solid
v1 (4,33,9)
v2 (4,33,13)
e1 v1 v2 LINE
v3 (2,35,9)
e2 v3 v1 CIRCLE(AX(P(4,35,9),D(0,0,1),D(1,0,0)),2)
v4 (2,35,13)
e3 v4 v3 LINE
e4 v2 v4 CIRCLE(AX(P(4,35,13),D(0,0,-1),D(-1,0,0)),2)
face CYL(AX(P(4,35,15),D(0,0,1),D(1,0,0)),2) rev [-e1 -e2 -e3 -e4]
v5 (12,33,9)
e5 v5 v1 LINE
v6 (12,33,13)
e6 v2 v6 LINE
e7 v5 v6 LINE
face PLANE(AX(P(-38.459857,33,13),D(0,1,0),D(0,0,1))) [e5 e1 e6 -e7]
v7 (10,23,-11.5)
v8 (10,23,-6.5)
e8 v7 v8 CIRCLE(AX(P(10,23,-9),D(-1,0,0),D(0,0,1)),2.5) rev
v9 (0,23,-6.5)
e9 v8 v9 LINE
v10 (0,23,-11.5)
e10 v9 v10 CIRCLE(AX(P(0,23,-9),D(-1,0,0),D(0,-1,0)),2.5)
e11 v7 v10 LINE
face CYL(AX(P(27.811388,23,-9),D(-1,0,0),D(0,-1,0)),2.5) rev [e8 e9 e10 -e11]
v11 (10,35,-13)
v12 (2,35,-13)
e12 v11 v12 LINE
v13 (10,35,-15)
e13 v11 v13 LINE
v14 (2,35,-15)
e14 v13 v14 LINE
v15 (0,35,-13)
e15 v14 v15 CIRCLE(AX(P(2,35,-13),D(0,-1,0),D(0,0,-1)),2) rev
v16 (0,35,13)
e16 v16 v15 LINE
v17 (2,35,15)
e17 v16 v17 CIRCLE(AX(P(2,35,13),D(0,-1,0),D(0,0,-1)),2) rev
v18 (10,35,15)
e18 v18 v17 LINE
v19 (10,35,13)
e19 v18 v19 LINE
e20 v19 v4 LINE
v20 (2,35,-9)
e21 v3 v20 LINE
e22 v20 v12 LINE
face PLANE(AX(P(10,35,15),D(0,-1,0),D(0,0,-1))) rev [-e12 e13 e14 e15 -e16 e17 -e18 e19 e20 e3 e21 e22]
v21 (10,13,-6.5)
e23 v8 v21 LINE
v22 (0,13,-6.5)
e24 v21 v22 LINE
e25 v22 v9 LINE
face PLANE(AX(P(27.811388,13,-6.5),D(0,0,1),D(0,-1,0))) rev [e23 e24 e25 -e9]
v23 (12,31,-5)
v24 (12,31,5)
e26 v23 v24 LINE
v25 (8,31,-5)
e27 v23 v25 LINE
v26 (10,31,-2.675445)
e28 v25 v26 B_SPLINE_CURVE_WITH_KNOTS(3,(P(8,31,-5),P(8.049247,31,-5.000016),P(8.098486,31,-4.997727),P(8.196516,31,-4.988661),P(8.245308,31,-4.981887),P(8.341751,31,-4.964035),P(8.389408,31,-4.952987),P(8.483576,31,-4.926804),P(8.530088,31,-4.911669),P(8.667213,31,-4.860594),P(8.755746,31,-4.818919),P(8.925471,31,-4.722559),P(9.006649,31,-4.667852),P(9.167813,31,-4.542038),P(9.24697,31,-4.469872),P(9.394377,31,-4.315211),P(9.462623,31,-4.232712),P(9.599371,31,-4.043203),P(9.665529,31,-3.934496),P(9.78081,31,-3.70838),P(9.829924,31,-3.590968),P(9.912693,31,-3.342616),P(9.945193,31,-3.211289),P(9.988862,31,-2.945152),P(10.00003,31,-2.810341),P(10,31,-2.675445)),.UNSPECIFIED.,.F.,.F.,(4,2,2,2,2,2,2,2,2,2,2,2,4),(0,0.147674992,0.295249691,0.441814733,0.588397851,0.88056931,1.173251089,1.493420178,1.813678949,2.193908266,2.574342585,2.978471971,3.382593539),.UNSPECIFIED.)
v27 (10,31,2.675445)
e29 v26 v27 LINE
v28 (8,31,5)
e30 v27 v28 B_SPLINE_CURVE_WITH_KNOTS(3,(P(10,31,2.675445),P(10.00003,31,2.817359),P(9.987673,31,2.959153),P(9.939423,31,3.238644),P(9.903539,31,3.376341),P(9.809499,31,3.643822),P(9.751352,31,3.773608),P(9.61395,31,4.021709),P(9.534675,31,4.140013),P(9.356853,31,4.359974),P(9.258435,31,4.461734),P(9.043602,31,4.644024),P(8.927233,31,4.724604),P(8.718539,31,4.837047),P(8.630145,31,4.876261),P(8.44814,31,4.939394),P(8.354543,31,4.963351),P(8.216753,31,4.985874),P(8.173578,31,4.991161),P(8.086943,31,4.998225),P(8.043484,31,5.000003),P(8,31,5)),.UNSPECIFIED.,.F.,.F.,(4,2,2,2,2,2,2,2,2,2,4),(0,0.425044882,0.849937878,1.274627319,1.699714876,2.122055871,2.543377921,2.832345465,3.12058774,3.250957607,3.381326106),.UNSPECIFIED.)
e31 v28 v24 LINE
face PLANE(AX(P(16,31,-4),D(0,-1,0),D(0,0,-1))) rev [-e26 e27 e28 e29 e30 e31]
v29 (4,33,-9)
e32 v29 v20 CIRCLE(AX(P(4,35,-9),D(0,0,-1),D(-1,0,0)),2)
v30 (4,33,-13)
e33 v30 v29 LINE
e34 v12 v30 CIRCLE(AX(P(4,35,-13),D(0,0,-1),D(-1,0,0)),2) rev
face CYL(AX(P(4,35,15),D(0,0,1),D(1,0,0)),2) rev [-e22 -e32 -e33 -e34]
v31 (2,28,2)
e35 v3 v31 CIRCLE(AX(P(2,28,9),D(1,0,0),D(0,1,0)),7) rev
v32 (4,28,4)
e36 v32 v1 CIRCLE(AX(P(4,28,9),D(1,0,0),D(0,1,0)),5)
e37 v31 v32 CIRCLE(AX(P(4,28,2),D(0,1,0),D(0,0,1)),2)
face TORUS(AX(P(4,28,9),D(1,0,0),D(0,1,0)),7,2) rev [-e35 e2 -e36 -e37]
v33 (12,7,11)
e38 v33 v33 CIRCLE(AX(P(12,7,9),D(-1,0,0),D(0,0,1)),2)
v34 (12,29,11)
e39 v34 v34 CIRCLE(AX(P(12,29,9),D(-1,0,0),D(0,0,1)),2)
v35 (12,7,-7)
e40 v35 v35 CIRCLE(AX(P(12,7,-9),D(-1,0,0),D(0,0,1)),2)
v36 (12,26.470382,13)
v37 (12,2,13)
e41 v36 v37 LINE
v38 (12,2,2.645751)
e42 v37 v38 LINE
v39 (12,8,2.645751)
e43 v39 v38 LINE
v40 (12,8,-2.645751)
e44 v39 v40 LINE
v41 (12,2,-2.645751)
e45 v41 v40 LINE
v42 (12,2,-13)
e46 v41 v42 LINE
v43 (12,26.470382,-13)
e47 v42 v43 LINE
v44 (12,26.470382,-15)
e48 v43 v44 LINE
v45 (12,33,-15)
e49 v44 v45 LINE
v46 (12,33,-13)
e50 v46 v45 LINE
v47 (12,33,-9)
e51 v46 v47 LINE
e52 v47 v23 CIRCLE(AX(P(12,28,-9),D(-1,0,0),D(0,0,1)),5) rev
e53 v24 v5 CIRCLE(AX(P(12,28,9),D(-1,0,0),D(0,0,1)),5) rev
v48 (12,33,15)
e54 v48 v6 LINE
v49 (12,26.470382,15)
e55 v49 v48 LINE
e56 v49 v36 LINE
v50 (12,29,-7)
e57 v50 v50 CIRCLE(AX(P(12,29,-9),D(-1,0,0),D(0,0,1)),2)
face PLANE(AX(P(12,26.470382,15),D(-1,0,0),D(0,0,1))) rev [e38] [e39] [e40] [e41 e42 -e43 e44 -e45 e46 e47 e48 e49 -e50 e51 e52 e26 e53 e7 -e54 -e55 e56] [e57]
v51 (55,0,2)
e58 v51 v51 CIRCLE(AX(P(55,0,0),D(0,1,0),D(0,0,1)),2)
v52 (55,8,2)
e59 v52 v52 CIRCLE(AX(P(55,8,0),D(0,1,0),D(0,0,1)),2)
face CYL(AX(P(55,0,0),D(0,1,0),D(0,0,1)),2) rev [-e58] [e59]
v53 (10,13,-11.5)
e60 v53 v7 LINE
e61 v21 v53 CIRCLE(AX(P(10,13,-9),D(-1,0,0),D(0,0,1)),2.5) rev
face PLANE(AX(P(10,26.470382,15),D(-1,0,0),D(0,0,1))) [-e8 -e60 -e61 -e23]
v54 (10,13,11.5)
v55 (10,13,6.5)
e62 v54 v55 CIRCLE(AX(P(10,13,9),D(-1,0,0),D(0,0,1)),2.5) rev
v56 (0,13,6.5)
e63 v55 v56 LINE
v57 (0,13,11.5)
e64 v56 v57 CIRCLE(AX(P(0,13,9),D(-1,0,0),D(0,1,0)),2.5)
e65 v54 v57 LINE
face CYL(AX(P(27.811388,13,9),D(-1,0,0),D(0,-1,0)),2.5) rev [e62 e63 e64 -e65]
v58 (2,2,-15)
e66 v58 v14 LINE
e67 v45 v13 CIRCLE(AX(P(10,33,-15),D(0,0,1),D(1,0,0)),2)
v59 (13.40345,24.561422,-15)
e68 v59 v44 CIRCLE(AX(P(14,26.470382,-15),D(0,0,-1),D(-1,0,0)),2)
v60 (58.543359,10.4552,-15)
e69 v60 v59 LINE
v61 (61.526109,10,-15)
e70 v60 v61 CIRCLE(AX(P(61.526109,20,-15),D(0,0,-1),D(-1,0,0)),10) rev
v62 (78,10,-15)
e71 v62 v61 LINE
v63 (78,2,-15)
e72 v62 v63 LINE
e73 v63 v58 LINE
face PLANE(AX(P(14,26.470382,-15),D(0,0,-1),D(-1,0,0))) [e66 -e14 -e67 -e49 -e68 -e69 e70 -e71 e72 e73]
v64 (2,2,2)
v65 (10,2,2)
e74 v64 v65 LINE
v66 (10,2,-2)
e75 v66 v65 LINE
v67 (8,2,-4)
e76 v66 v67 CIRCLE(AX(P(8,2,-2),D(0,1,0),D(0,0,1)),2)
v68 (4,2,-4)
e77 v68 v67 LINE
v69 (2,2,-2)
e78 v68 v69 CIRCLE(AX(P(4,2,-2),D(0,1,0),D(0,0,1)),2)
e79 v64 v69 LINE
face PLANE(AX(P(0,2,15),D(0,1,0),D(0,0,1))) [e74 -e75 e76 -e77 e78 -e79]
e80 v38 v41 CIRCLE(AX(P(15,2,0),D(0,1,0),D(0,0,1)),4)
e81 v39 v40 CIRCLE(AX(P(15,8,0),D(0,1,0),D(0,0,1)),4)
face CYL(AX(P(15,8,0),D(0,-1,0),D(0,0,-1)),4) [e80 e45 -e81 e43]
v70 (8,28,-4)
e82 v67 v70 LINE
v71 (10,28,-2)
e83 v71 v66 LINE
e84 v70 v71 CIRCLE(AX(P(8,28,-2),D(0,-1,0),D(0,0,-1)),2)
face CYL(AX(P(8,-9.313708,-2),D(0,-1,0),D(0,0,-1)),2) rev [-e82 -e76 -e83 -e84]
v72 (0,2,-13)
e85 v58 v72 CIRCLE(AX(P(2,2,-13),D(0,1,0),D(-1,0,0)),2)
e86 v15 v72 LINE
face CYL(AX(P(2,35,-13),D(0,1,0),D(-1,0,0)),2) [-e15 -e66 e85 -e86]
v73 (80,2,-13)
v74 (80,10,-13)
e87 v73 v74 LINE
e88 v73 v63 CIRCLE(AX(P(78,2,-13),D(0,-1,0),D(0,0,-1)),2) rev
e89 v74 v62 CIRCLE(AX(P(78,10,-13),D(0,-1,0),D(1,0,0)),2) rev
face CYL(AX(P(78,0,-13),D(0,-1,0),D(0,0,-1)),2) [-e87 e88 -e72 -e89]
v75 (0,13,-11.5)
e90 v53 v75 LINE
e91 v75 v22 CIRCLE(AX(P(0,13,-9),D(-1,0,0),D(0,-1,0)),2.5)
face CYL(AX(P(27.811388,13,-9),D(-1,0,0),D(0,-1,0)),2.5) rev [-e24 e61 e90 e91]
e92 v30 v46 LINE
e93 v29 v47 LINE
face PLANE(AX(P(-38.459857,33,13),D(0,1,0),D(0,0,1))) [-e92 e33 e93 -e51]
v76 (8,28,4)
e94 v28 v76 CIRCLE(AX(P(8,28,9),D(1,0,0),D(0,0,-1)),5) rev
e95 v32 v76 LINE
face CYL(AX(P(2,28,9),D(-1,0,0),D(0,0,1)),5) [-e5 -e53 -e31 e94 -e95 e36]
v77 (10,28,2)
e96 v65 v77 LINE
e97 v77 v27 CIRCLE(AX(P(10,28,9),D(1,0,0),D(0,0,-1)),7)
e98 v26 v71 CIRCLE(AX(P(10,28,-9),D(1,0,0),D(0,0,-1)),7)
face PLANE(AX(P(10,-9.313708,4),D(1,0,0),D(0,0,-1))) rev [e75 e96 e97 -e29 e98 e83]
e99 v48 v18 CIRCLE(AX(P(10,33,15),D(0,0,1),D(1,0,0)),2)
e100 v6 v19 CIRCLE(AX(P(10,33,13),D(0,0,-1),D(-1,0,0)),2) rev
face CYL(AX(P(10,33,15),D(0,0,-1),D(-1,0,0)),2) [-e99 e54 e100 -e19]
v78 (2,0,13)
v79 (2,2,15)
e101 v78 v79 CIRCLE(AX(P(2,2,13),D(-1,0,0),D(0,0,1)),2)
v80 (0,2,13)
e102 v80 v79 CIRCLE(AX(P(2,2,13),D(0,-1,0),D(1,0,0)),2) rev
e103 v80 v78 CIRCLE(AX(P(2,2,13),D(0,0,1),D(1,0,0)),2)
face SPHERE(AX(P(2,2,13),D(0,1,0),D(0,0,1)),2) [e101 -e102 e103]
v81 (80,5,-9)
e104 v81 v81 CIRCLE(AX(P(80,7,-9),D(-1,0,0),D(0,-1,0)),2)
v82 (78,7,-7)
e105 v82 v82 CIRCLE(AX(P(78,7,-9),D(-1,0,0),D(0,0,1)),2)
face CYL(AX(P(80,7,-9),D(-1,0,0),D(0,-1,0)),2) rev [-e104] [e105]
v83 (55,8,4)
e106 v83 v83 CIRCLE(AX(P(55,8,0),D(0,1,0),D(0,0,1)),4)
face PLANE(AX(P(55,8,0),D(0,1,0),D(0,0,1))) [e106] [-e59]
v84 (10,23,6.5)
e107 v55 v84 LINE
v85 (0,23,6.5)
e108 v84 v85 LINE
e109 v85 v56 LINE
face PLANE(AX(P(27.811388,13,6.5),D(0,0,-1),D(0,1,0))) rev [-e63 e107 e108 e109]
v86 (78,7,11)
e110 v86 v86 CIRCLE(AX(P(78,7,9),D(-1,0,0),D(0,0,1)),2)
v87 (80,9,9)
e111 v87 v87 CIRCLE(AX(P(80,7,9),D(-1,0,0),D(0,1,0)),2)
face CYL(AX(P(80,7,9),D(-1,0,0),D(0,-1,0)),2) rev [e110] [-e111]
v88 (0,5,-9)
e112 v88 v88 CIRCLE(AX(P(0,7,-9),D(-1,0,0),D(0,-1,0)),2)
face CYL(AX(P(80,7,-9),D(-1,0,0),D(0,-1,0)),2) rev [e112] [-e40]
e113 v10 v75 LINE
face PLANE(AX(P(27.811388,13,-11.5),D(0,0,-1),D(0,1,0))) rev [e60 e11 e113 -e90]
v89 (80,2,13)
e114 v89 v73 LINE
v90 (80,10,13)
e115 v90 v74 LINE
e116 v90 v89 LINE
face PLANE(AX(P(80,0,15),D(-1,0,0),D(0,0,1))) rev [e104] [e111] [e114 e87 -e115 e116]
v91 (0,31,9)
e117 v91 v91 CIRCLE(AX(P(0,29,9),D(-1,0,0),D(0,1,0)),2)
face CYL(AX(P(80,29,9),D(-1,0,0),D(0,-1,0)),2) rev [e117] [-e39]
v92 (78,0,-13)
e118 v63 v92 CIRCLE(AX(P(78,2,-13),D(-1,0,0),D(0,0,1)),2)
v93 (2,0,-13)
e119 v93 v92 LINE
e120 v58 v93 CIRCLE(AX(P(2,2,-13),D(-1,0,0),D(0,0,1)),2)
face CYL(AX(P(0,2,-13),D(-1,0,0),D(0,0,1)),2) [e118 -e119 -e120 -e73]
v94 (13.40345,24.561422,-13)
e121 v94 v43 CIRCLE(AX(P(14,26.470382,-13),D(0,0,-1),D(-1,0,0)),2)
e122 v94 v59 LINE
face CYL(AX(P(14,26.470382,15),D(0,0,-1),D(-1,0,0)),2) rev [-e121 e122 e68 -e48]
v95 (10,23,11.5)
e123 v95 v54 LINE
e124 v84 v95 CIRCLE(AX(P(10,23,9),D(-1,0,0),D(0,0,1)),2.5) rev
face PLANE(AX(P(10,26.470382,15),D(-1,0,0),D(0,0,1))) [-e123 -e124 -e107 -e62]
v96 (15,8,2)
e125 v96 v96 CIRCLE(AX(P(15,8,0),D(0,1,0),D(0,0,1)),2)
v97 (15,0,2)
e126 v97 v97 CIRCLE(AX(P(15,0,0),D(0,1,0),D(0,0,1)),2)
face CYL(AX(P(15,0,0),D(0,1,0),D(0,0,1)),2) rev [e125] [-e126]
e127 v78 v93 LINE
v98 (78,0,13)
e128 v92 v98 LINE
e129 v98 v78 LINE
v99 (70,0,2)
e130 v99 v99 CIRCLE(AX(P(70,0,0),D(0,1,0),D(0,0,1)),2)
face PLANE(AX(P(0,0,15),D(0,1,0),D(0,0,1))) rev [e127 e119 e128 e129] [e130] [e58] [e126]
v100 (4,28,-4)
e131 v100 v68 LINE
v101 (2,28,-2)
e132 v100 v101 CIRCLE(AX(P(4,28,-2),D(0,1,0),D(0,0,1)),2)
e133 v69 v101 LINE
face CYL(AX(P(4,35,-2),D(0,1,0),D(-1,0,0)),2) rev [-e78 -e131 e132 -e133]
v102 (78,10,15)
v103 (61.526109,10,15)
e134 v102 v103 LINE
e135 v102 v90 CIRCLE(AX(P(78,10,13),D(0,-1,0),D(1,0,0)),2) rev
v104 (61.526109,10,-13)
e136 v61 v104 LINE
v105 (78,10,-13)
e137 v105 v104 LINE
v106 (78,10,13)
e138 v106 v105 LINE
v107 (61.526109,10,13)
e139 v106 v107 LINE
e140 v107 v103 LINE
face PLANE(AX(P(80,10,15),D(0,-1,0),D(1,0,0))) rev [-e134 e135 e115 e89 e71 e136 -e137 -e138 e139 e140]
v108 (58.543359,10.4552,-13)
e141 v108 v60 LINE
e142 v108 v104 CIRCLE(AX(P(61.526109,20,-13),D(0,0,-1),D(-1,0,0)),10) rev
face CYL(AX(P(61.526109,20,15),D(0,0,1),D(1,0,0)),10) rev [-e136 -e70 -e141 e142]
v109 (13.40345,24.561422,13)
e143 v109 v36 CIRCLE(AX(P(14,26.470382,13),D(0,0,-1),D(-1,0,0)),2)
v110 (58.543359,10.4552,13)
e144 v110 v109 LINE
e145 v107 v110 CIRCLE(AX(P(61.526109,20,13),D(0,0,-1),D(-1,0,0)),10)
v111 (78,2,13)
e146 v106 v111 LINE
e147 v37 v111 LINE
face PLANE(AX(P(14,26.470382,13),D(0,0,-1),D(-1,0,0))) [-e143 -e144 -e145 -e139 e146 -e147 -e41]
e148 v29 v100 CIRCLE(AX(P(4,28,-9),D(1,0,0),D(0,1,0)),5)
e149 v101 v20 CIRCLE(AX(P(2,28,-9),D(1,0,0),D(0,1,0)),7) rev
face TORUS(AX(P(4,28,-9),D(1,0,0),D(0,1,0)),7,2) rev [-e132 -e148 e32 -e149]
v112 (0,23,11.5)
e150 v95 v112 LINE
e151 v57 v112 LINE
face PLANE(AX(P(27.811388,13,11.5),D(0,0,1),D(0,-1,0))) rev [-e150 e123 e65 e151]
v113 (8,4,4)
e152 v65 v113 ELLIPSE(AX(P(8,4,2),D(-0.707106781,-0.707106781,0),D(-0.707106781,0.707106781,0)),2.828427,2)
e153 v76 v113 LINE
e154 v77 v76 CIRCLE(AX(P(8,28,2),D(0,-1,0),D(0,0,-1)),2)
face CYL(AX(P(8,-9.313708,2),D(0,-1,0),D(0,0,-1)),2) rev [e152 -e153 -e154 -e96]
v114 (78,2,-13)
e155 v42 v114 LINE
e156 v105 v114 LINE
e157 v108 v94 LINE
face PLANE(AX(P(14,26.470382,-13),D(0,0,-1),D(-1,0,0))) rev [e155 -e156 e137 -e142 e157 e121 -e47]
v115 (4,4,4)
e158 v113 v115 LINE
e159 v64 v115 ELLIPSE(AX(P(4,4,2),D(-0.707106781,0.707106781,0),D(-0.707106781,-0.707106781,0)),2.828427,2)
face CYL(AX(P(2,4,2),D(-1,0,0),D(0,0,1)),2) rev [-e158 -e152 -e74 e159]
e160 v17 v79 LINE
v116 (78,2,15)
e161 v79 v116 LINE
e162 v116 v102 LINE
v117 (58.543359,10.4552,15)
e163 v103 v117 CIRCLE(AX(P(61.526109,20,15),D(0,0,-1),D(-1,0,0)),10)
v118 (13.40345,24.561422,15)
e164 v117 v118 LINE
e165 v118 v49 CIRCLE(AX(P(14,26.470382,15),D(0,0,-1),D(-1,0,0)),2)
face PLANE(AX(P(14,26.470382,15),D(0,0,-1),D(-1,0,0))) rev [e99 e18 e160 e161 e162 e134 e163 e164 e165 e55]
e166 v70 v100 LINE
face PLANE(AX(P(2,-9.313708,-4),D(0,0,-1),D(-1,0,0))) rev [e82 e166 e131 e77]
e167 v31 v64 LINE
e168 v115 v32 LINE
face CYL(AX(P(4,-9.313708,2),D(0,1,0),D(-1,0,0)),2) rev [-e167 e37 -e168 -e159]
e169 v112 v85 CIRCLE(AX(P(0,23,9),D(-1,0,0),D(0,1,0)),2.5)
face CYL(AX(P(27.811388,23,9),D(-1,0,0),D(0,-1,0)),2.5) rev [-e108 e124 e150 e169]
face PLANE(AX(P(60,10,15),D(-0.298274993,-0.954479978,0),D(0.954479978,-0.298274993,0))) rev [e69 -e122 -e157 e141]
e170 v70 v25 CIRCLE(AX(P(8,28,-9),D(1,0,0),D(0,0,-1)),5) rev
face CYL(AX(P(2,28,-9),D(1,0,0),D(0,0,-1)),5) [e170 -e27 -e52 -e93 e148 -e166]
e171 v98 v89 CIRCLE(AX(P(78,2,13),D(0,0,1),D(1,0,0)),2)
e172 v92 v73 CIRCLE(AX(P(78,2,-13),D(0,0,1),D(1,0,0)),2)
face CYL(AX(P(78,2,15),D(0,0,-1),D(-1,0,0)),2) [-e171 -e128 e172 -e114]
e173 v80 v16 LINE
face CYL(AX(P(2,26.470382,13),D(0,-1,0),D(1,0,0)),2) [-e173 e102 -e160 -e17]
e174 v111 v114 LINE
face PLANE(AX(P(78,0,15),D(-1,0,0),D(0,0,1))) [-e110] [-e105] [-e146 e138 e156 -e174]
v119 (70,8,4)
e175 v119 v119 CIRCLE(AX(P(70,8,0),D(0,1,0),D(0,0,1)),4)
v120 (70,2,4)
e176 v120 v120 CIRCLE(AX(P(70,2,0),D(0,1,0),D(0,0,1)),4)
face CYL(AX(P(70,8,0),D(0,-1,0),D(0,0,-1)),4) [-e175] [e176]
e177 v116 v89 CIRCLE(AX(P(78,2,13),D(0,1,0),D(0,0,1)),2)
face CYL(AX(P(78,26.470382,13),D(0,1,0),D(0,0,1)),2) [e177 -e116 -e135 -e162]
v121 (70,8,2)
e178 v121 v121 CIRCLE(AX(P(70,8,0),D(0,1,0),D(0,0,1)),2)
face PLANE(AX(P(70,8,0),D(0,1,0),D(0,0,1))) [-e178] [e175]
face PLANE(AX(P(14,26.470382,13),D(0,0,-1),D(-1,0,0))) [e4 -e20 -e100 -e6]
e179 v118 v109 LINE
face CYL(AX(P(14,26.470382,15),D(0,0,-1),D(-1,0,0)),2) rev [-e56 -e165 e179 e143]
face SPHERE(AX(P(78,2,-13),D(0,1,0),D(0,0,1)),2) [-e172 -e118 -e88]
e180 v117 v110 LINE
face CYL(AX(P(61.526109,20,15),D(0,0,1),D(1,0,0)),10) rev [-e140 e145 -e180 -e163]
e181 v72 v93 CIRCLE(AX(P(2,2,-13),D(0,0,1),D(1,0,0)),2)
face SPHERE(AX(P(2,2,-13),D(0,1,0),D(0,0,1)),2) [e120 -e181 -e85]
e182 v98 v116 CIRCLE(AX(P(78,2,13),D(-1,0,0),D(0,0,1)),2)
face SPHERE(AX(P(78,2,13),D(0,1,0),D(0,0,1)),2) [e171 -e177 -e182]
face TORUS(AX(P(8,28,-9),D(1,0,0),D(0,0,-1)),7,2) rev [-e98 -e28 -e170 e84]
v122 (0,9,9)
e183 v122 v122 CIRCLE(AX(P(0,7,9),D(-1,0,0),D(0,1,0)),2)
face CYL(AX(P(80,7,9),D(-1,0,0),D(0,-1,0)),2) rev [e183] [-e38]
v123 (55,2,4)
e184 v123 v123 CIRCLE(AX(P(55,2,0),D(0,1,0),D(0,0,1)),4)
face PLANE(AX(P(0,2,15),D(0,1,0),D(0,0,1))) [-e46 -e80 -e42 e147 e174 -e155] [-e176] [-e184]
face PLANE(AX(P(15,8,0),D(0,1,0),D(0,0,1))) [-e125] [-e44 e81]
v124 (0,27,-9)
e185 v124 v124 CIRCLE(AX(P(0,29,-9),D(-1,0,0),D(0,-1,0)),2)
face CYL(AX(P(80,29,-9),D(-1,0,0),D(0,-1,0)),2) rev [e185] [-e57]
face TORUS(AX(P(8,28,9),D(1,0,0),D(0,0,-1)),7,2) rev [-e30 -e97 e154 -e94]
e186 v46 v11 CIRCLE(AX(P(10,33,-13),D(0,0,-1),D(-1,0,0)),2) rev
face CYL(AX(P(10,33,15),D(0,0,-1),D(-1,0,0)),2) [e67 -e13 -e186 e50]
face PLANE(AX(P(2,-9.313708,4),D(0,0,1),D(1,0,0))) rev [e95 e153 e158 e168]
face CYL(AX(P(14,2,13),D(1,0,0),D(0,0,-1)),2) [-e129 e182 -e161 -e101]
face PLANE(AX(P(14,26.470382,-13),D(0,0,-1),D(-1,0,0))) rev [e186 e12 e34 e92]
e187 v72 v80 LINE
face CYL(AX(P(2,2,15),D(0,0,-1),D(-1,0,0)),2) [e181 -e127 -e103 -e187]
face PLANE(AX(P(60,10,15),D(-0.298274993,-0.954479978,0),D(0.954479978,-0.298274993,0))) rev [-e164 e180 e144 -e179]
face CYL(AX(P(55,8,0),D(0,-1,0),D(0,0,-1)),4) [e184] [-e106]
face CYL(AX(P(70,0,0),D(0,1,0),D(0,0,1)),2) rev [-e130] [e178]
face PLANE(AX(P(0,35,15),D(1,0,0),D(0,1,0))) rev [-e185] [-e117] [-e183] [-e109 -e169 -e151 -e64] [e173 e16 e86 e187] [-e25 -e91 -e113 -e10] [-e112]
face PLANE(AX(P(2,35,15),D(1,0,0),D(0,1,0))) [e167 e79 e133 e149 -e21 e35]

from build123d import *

# Parameters (mm, degrees)
BOSS_EXTRUDE1_DEPTH = 15
FILLET2_R           = 10
FILLET3_R           = 2
FILLET4_R           = 2
SHELL1_START        = 2
SHELL1_OUTLINE_W    = 33
SHELL1_OUTLINE_H    = 26
SHELL1_DEPTH        = 76
SKETCH2_R           = 2
CUT_EXTRUDE1_DEPTH  = 88.82938005
BOSS_EXTRUDE2_START = 6
SKETCH3_R           = 4
SKETCH3_R_2         = 2
BOSS_EXTRUDE2_DEPTH = 6
SKETCH4_W           = 26
SKETCH4_H           = 31
BOSS_EXTRUDE3_DEPTH = 10
SKETCH5_W           = 8
SKETCH5_H           = 8
CUT_EXTRUDE2_DEPTH  = 31
SKETCH6_W           = 8
SKETCH6_H           = 2
CUT_EXTRUDE3_DEPTH  = 6
FILLET5_R           = 5
FILLET6_R           = 2
SKETCH7_R           = 2
CUT_EXTRUDE4_DEPTH  = 89.600225733
CUT_EXTRUDE6_DEPTH  = 10


# Read off the part's stored shape, not the designer's step: Shell1
# Some blends are built 0.0001 mm under size
with BuildPart() as part:
    # Sketch1 → Boss-Extrude1 (new, symmetric)
    with BuildSketch(Plane.XY):
        with BuildLine():
            Line((0, 35), (0, 0))
            Line((0, 0), (80, 0))
            Line((80, 0), (80, 10))
            Line((80, 10), (60, 10))
            Line((60, 10), (13.403450014, 24.561421871))
            ThreePointArc((13.403450014, 24.561421871), (12.388618609, 25.28570887), (12, 26.470381827))
            Line((12, 26.470381827), (12, 33))
            ThreePointArc((12, 33), (11.414213562, 34.414213562), (10, 35))
            Line((10, 35), (0, 35))
        make_face()
    extrude(amount=BOSS_EXTRUDE1_DEPTH, both=True)

    # Fillet2
    fillet2_edges = [part.edges().sort_by_distance(p)[0] for p in [
        (60, 10, 0),
    ]]
    fillet(fillet2_edges, radius=FILLET2_R)

    # Fillet3
    fillet3_edges = [part.edges().sort_by_distance(p)[0] for p in [
        (80, 5, -15),
        (0, 17.5, -15),
        (80, 5, 15),
        (0, 17.5, 15),
    ]]
    fillet(fillet3_edges, radius=FILLET3_R)

    # Fillet4
    fillet4_edges = [part.edges().sort_by_distance(p)[0] for p in [
        (0, 0, 0),
        (40, 0, -15),
        (80, 0, 0),
        (40, 0, 15),
        (79.414213562, 0, 14.414213562),
        (79.414213562, 0, -14.414213562),
        (0.585786438, 0, 14.414213562),
        (0.585786438, 0, -14.414213562),
    ]]
    fillet(fillet4_edges, radius=FILLET4_R)

    # Shell1 outline → Shell1 (cut)
    with BuildSketch(Plane.YZ.offset(SHELL1_START)):
        with Locations((18.5, 0)):
            Rectangle(SHELL1_OUTLINE_W, SHELL1_OUTLINE_H)
    extrude(amount=SHELL1_DEPTH, mode=Mode.SUBTRACT)

    # Sketch2 → Cut-Extrude1 (cut, through all)
    with BuildSketch(Plane(origin=(0, 2, 0), x_dir=(1, 0, 0), z_dir=(0, 1, 0))):
        with Locations(Location((70, 0, 0), (0, 0, 270))):
            Circle(SKETCH2_R)
        with Locations(Location((55, 0, 0), (0, 0, 270))):
            Circle(SKETCH2_R)
        with Locations(Location((15, 0, 0), (0, 0, 270))):
            Circle(SKETCH2_R)
    extrude(amount=-CUT_EXTRUDE1_DEPTH, mode=Mode.SUBTRACT)

    # Sketch3 → Boss-Extrude2 (add)
    # profile 1 of 3: a face of its own
    with BuildSketch(Plane(origin=(0, 2, 0), x_dir=(1, 0, 0), z_dir=(0, 1, 0)).offset(BOSS_EXTRUDE2_START)):
        with Locations(Location((70, 0, 0), (0, 0, 270))):
            Circle(SKETCH3_R)
        with Locations(Location((70, 0, 0), (0, 0, 270))):
            Circle(SKETCH3_R_2, mode=Mode.SUBTRACT)
    # profile 2 of 3: a face of its own
    with BuildSketch(Plane(origin=(0, 2, 0), x_dir=(1, 0, 0), z_dir=(0, 1, 0)).offset(BOSS_EXTRUDE2_START)):
        with Locations(Location((55, 0, 0), (0, 0, 270))):
            Circle(SKETCH3_R)
        with Locations(Location((55, 0, 0), (0, 0, 270))):
            Circle(SKETCH3_R_2, mode=Mode.SUBTRACT)
    # profile 3 of 3: a face of its own
    with BuildSketch(Plane(origin=(0, 2, 0), x_dir=(1, 0, 0), z_dir=(0, 1, 0)).offset(BOSS_EXTRUDE2_START)):
        with Locations(Location((15, 0, 0), (0, 0, 270))):
            Circle(SKETCH3_R)
        with Locations(Location((15, 0, 0), (0, 0, 270))):
            Circle(SKETCH3_R_2, mode=Mode.SUBTRACT)
    extrude(amount=-BOSS_EXTRUDE2_DEPTH)

    # Sketch4 → Boss-Extrude3 (add)
    with BuildSketch(Plane(origin=(12, 0, 0), x_dir=(0, 0, -1), z_dir=(1, 0, 0))):
        with Locations((0, 17.5)):
            Rectangle(SKETCH4_W, SKETCH4_H)
    extrude(amount=-BOSS_EXTRUDE3_DEPTH)

    # Sketch5 → Cut-Extrude2 (cut)
    with BuildSketch(Plane(origin=(0, 33, 0), x_dir=(1, 0, 0), z_dir=(0, 1, 0))):
        with Locations((6, 0)):
            Rectangle(SKETCH5_W, SKETCH5_H)
    extrude(amount=-CUT_EXTRUDE2_DEPTH, mode=Mode.SUBTRACT)

    # Sketch6 → Cut-Extrude3 (cut)
    with BuildSketch(Plane.ZY.offset(-10)):
        with Locations((0, 32)):
            Rectangle(SKETCH6_W, SKETCH6_H)
    extrude(amount=-CUT_EXTRUDE3_DEPTH, mode=Mode.SUBTRACT)

    # Fillet5
    # the kernel refuses this fillet: 5 mm, written as the material it takes off along each edge
    with BuildSketch(Plane(origin=(24.5, 33, -4), x_dir=(0, 0, -1), z_dir=(-1, 0, 0))) as fillet5_piece_1_section:
        with BuildLine():
            CenterArc((FILLET5_R, FILLET5_R), FILLET5_R, 180, 90)
            Line((0, FILLET5_R), (0, 0))
            Line((0, 0), (FILLET5_R, 0))
        make_face()
    fillet5_piece_1 = extrude(amount=22.5, mode=Mode.PRIVATE)
    fillet5_piece_1 = split(fillet5_piece_1, bisect_by=Plane(origin=(11, 31, -5.295296425), z_dir=(0, 1, 0)), keep=Keep.TOP, mode=Mode.PRIVATE)
    add(fillet5_piece_1, mode=Mode.SUBTRACT)
    with BuildSketch(Plane(origin=(24.5, 33, -4), x_dir=(0, 0, -1), z_dir=(-1, 0, 0))) as fillet5_piece_2_section:
        with BuildLine():
            CenterArc((FILLET5_R, FILLET5_R), FILLET5_R, 180, 90)
            Line((0, FILLET5_R), (0, 0))
            Line((0, 0), (FILLET5_R, 0))
        make_face()
    fillet5_piece_2 = extrude(amount=22.5, mode=Mode.PRIVATE)
    fillet5_piece_2 = split(fillet5_piece_2, bisect_by=Plane(origin=(10, 30.265828048, -4.294049439), z_dir=(-1, 0, 0)), keep=Keep.TOP, mode=Mode.PRIVATE)
    add(fillet5_piece_2, mode=Mode.SUBTRACT)
    with BuildSketch(Plane(origin=(24.5, 33, 4), x_dir=(0, -1, 0), z_dir=(-1, 0, 0))) as fillet5_piece_3_section:
        with BuildLine():
            CenterArc((FILLET5_R, FILLET5_R), FILLET5_R, 180, 90)
            Line((0, FILLET5_R), (0, 0))
            Line((0, 0), (FILLET5_R, 0))
        make_face()
    fillet5_piece_3 = extrude(amount=22.5, mode=Mode.PRIVATE)
    fillet5_piece_3 = split(fillet5_piece_3, bisect_by=Plane(origin=(11, 31, 5.295296425), z_dir=(0, 1, 0)), keep=Keep.TOP, mode=Mode.PRIVATE)
    add(fillet5_piece_3, mode=Mode.SUBTRACT)
    with BuildSketch(Plane(origin=(24.5, 33, 4), x_dir=(0, -1, 0), z_dir=(-1, 0, 0))) as fillet5_piece_4_section:
        with BuildLine():
            CenterArc((FILLET5_R, FILLET5_R), FILLET5_R, 180, 90)
            Line((0, FILLET5_R), (0, 0))
            Line((0, 0), (FILLET5_R, 0))
        make_face()
    fillet5_piece_4 = extrude(amount=22.5, mode=Mode.PRIVATE)
    fillet5_piece_4 = split(fillet5_piece_4, bisect_by=Plane(origin=(10, 30.265828048, 4.294049439), z_dir=(-1, 0, 0)), keep=Keep.TOP, mode=Mode.PRIVATE)
    add(fillet5_piece_4, mode=Mode.SUBTRACT)

    # Fillet6
    fillet6_edges = [part.edges().sort_by_distance(p)[0] for p in [
        (2, 33, -11),
        (2, 31.535533906, -5.464466094),
        (10, 29.58113883, -4.25658351),
        (2, 33, 11),
        (2, 31.535533906, 5.464466094),
        (2, 15, -4),
        (10, 15, -4),
        (2, 15, 4),
        (10, 29.58113883, 4.25658351),
        (6, 2, 4),
        (10, 15, 4),
    ]]
    fillet(fillet6_edges, radius=FILLET6_R - 0.0001)  # a hair under: the kernel refuses the full size

    # Sketch7 → Cut-Extrude4 (cut, through all)
    with BuildSketch(Plane.ZY):
        with Locations(Location((-9, 29, 0), (0, 0, 270))):
            Circle(SKETCH7_R)
        with Locations(Location((-9, 7, 0), (0, 0, 270))):
            Circle(SKETCH7_R)
        with Locations((9, 7)):
            Circle(SKETCH7_R)
        with Locations((9, 29)):
            Circle(SKETCH7_R)
    extrude(amount=-CUT_EXTRUDE4_DEPTH, mode=Mode.SUBTRACT)

    # Sketch8 → Cut-Extrude6 (cut)
    with BuildSketch(Plane.ZY):
        with BuildLine():
            Line((-11.5, 13), (-11.5, 23))
            ThreePointArc((-11.5, 23), (-9, 25.5), (-6.5, 23))
            Line((-6.5, 23), (-6.5, 13))
            ThreePointArc((-6.5, 13), (-9, 10.5), (-11.5, 13))
        make_face()
        with BuildLine():
            Line((11.5, 13), (11.5, 23))
            ThreePointArc((11.5, 23), (9, 25.5), (6.5, 23))
            Line((6.5, 23), (6.5, 13))
            ThreePointArc((6.5, 13), (9, 10.5), (11.5, 13))
        make_face()
    extrude(amount=-CUT_EXTRUDE6_DEPTH, mode=Mode.SUBTRACT)


solid = part.part
